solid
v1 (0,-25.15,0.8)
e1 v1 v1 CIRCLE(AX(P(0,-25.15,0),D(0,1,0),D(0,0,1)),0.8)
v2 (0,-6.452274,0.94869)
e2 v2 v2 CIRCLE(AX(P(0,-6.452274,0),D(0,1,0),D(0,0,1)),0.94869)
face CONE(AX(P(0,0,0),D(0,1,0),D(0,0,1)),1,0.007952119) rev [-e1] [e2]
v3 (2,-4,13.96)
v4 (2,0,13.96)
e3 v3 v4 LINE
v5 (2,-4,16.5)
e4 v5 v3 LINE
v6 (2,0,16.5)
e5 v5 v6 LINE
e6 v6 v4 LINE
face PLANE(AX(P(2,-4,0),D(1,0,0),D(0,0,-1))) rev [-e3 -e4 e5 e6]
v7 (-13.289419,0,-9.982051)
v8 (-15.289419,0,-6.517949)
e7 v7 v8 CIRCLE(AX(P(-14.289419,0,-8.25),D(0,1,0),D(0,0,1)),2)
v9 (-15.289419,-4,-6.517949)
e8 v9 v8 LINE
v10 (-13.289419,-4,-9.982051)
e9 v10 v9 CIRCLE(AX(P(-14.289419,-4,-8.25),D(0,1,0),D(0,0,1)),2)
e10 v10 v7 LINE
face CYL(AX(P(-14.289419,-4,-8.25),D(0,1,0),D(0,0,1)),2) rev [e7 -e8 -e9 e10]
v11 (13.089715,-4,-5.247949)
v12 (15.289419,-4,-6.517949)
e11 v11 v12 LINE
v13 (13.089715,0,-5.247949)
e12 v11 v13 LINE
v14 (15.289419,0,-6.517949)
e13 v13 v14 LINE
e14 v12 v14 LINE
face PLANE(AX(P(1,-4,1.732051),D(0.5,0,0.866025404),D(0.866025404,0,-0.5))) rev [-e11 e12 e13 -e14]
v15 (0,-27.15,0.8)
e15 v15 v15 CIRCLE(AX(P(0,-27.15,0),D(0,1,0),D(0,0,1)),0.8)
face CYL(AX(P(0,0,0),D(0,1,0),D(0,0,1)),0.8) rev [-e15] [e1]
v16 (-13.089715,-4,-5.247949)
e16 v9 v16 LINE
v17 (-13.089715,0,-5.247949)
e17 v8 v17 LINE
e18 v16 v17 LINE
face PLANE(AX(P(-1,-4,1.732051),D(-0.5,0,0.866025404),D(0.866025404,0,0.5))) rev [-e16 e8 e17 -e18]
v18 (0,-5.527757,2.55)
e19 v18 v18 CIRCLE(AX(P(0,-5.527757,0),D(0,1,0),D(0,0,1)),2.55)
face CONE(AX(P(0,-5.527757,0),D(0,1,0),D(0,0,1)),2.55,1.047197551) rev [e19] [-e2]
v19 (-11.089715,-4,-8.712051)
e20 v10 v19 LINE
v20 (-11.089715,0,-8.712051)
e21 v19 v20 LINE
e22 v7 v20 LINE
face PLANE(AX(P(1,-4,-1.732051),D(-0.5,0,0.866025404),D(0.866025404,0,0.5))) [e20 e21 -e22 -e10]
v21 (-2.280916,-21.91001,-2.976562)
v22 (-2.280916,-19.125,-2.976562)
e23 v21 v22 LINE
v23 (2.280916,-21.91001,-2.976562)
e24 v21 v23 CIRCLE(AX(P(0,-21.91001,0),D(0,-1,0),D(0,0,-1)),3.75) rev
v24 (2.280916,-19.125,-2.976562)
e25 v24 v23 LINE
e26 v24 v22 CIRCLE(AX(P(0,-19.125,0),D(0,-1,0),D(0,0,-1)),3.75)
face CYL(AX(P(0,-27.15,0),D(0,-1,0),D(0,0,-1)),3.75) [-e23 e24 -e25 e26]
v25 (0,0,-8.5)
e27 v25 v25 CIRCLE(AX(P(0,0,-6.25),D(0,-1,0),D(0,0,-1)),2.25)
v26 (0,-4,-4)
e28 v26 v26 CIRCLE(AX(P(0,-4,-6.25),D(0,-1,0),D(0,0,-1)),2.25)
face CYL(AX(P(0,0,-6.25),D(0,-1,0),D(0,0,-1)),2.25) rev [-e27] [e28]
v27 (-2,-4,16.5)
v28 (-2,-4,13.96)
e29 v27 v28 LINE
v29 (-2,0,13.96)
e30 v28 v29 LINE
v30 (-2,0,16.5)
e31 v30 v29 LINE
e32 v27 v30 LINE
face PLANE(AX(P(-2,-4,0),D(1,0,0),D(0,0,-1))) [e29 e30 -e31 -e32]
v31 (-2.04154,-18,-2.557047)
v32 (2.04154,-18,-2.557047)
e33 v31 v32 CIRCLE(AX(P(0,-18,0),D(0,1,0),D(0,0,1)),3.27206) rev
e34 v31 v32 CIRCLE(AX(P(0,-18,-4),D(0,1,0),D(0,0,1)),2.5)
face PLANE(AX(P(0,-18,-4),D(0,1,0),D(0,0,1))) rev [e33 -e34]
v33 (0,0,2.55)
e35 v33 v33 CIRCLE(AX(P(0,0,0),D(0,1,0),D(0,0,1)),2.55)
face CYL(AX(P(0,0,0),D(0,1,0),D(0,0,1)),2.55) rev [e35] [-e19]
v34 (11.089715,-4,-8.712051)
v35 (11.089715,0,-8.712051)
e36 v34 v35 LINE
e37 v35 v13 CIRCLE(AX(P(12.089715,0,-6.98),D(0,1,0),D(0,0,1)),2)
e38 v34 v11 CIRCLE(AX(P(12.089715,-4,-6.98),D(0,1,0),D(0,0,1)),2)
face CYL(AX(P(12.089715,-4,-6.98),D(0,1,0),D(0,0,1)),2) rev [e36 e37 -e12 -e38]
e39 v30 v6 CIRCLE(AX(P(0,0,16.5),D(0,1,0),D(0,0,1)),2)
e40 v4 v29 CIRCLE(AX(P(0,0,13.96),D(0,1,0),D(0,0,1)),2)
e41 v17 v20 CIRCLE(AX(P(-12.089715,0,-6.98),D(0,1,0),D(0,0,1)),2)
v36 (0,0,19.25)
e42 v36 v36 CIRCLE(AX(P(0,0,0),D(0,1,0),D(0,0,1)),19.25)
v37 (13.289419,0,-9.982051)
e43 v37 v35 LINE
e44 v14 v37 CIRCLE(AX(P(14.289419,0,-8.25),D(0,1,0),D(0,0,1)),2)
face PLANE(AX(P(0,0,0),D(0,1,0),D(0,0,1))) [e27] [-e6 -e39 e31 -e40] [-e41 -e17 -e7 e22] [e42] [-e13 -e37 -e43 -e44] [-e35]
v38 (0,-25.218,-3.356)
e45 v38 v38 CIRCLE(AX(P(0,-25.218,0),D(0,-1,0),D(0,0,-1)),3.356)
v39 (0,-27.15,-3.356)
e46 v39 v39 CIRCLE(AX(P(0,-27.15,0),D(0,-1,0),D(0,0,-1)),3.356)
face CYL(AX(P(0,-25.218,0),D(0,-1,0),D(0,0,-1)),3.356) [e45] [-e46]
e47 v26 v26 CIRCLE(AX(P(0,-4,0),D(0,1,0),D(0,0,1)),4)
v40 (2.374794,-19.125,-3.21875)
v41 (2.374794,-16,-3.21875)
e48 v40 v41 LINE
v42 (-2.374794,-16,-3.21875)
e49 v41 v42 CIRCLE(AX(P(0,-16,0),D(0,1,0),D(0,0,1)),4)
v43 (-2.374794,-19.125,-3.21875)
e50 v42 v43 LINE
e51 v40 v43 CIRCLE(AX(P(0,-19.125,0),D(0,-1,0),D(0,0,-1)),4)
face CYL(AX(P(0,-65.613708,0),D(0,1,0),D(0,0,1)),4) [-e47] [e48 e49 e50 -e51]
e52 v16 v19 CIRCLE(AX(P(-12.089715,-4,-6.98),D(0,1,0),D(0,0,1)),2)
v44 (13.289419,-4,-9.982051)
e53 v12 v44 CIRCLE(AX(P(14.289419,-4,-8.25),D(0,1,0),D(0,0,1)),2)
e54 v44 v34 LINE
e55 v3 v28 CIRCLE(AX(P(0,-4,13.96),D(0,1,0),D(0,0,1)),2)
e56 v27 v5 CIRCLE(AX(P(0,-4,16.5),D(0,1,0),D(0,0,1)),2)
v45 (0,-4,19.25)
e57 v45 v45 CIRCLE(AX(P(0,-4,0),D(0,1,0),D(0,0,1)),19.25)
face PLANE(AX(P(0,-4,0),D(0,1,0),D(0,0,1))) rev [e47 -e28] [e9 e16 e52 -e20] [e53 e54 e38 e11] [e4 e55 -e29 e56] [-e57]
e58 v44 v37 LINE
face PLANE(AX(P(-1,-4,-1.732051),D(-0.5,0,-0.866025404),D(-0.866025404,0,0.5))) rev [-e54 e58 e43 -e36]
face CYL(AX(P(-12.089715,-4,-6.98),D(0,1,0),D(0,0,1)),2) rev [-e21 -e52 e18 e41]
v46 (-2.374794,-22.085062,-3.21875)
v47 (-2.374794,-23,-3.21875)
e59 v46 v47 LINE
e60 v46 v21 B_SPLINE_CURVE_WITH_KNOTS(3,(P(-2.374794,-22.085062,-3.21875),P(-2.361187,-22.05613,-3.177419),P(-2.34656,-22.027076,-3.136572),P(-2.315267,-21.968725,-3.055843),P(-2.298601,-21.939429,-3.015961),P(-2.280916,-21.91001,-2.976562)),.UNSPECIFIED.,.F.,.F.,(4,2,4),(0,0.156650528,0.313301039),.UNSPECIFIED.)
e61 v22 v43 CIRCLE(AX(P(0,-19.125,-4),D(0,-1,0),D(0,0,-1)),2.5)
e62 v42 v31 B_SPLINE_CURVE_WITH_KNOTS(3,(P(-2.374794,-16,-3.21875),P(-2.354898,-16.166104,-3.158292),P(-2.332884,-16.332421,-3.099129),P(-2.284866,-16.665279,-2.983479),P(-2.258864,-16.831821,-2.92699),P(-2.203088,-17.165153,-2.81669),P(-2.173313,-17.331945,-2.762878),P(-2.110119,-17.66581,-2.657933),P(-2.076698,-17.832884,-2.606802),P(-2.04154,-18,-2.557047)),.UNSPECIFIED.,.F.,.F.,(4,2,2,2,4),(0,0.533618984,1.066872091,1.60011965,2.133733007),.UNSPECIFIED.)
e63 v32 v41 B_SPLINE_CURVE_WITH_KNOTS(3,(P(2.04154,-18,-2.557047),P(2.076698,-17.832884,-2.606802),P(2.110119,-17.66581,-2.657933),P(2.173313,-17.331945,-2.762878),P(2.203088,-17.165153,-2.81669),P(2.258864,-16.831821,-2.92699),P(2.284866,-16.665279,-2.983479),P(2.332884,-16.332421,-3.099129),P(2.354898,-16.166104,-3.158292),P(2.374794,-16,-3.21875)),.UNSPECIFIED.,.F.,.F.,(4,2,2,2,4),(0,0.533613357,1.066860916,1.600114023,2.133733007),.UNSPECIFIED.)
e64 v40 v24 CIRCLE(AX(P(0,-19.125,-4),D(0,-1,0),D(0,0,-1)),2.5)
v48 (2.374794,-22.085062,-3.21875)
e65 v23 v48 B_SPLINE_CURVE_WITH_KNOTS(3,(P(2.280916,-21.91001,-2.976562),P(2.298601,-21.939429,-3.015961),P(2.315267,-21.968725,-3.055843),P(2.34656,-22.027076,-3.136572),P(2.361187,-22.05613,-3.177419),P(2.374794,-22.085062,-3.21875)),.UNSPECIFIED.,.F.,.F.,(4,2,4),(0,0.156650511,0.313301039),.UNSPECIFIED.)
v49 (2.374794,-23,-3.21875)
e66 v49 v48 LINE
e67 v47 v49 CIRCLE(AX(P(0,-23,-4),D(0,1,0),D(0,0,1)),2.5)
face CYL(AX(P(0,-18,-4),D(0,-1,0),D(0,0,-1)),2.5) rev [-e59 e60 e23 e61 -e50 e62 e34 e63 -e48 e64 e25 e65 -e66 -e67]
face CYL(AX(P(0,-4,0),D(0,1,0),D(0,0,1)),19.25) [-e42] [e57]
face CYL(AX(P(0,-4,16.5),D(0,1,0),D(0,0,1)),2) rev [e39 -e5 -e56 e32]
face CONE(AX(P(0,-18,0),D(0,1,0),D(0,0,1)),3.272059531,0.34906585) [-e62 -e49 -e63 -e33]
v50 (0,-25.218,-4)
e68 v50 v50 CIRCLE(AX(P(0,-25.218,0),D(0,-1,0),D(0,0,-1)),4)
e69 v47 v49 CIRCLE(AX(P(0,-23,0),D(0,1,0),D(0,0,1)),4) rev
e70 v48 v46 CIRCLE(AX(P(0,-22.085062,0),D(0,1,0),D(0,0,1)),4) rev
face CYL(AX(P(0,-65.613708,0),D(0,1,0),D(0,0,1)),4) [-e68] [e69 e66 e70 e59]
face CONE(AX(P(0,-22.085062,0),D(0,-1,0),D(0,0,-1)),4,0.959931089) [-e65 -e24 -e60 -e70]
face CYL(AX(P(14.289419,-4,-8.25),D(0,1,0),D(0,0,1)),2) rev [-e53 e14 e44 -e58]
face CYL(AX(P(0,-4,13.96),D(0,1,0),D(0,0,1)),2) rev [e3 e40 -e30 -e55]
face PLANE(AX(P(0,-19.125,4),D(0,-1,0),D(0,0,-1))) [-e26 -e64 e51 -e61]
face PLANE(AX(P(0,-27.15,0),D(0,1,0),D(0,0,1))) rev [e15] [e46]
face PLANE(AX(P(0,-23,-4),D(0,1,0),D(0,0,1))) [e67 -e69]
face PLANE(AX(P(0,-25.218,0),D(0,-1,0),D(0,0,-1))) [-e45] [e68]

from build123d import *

# Parameters (mm, degrees)
SKETCH1_R           = 19.25
SKETCH1_R_2         = 4
BOSS_EXTRUDE1_DEPTH = 4
SKETCH1_4_R         = 4
BOSS_EXTRUDE2_DEPTH = 27.15
CUT_EXTRUDE1_START  = -1.932
SKETCH6_R           = 4
SKETCH6_R_2         = 3.356
CUT_EXTRUDE1_DEPTH  = 1.932
SKETCH7_R           = 2.25
CUT_EXTRUDE2_DEPTH  = 36.735801376
SKETCH8_R           = 2.5
CUT_EXTRUDE3_DEPTH  = 5
CHAMFER1_SIZE       = 2
CHAMFER1_SIZE2      = 0.727940469
SKETCH9_W           = 0.25
SKETCH9_H           = 2.75
CHAMFER3_SIZE       = 0.3
CHAMFER3_SIZE_2     = 0.210062261


with BuildPart() as part:
    # Sketch1 → Boss-Extrude1 (new body)
    # profile 1 of 2: a face of its own
    with BuildSketch(Plane(origin=(0, 0, 0), x_dir=(1, 0, 0), z_dir=(0, 1, 0))):
        with Locations(Location((0, 0, 0), (0, 0, 270))):
            Circle(SKETCH1_R)
        with BuildLine():
            ThreePointArc((2, -16.5), (0, -18.5), (-2, -16.5))
            Line((-2, -16.5), (-2, -16.378339354))
            ThreePointArc((-2, -16.378339354), (-14.289419162, -8.25), (-15.184057953, 6.45711887))
            Line((-15.184057953, 6.45711887), (-15.289419162, 6.517949192))
            ThreePointArc((-15.289419162, 6.517949192), (-16.02146997, 9.25), (-13.289419162, 9.982050808))
            Line((-13.289419162, 9.982050808), (-13.184057953, 9.921220485))
            ThreePointArc((-13.184057953, 9.921220485), (0, 16.5), (13.184057953, 9.921220485))
            Line((13.184057953, 9.921220485), (13.289419162, 9.982050808))
            ThreePointArc((13.289419162, 9.982050808), (16.02146997, 9.25), (15.289419162, 6.517949192))
            Line((15.289419162, 6.517949192), (15.184057953, 6.45711887))
            ThreePointArc((15.184057953, 6.45711887), (16.167667677, 3.294923655), (16.5, 0))
            ThreePointArc((16.5, 0), (12.354149101, -10.937321427), (2, -16.378339354))
            Line((2, -16.378339354), (2, -16.5))
        make_face(mode=Mode.SUBTRACT)
    # profile 2 of 2: a face of its own
    with BuildSketch(Plane(origin=(0, 0, 0), x_dir=(1, 0, 0), z_dir=(0, 1, 0))):
        with BuildLine():
            ThreePointArc((-15.184057953, 6.45711887), (-14.289419162, -8.25), (-2, -16.378339354))
            Line((-2, -16.378339354), (-2, -13.96))
            ThreePointArc((-2, -13.96), (0, -11.96), (2, -13.96))
            Line((2, -13.96), (2, -16.378339354))
            ThreePointArc((2, -16.378339354), (12.354149101, -10.937321427), (16.5, 0))
            ThreePointArc((16.5, 0), (16.167667677, 3.294923655), (15.184057953, 6.45711887))
            Line((15.184057953, 6.45711887), (13.089714637, 5.247949192))
            ThreePointArc((13.089714637, 5.247949192), (10.357663829, 5.98), (11.089714637, 8.712050808))
            Line((11.089714637, 8.712050808), (13.184057953, 9.921220485))
            ThreePointArc((13.184057953, 9.921220485), (0, 16.5), (-13.184057953, 9.921220485))
            Line((-13.184057953, 9.921220485), (-11.094979939, 8.715090731))
            Line((-11.094979939, 8.715090731), (-11.089714637, 8.712050808))
            ThreePointArc((-11.089714637, 8.712050808), (-10.357663829, 5.98), (-13.089714637, 5.247949192))
            Line((-13.089714637, 5.247949192), (-15.184057953, 6.45711887))
        make_face()
        with Locations(Location((0, 0, 0), (0, 0, 270))):
            Circle(SKETCH1_R_2, mode=Mode.SUBTRACT)
    extrude(amount=-BOSS_EXTRUDE1_DEPTH)

    # Sketch1<4> → Boss-Extrude2 (add)
    with BuildSketch(Plane(origin=(0, 0, 0), x_dir=(1, 0, 0), z_dir=(0, 1, 0))):
        with Locations(Location((0, 0, 0), (0, 0, 270))):
            Circle(SKETCH1_4_R)
    extrude(amount=-BOSS_EXTRUDE2_DEPTH)

    # Sketch2 → Cut-Revolve4 (revolve, cut)
    with BuildSketch(Plane(origin=(0, 0, 0), x_dir=(0, 0, -1), z_dir=(1, 0, 0)), mode=Mode.PRIVATE) as cut_revolve4_sk:
        Polygon((0, -27.15), (0.8, -27.15), (0.8, -25.15), (1, 0), (0, 0), align=None)
    revolve(cut_revolve4_sk.sketch.rotate(Axis((0, 0, 0), (0, -1, 0)), 180), axis=Axis((0, 0, 0), (0, -1, 0)), mode=Mode.SUBTRACT)

    # Sketch5 → Cut-Revolve8 (revolve, cut)
    with BuildSketch(Plane.XY, mode=Mode.PRIVATE) as cut_revolve8_sk:
        Polygon((0, -7), (-2.55, -5.527756814), (-2.55, 0), (0, 0), align=None)
    revolve(cut_revolve8_sk.sketch.rotate(Axis((0, 0, 0), (0, -1, 0)), 270), axis=Axis((0, 0, 0), (0, -1, 0)), mode=Mode.SUBTRACT)

    # Sketch6 → Cut-Extrude1 (cut)
    with BuildSketch(Plane.XZ.offset(27.15).offset(CUT_EXTRUDE1_START)):
        with Locations(Location((0, 0, 0), (0, 0, 90))):
            Circle(SKETCH6_R)
        with Locations(Location((0, 0, 0), (0, 0, 270))):
            Circle(SKETCH6_R_2, mode=Mode.SUBTRACT)
    extrude(amount=CUT_EXTRUDE1_DEPTH, mode=Mode.SUBTRACT)

    # Sketch7 → Cut-Extrude2 (cut, through all)
    with BuildSketch(Plane.XZ.offset(4)):
        with Locations(Location((0, -6.25, 0), (0, 0, 270))):
            Circle(SKETCH7_R)
    extrude(amount=-CUT_EXTRUDE2_DEPTH, mode=Mode.SUBTRACT)

    # Sketch8 → Cut-Extrude3 (cut)
    with BuildSketch(Plane(origin=(0, -23, 0), x_dir=(1, 0, 0), z_dir=(0, 1, 0))):
        with Locations((0, 4)):
            Circle(SKETCH8_R)
    extrude(amount=CUT_EXTRUDE3_DEPTH, mode=Mode.SUBTRACT)

    # Chamfer1
    chamfer1_edges = [part.edges().sort_by_distance(p)[0] for p in [
        (0, -18, -4),
    ]]
    chamfer1_side = [part.faces().sort_by_distance(p)[0] for p in [
        (0, -14.609, -4),
    ]]
    chamfer(chamfer1_edges, length=CHAMFER1_SIZE, length2=CHAMFER1_SIZE2, reference=chamfer1_side[0])

    # Sketch9 → Cut-Revolve9 (revolve, cut)
    with BuildSketch(Plane(origin=(0, 0, 0), x_dir=(0, 0, -1), z_dir=(1, 0, 0)), mode=Mode.PRIVATE) as cut_revolve9_sk:
        with Locations((-3.875, -20.5)):
            Rectangle(SKETCH9_W, SKETCH9_H)
    revolve(cut_revolve9_sk.sketch.rotate(Axis((0, -27.15, 0), (0, 1, 0)), 143.580086271), axis=Axis((0, -27.15, 0), (0, 1, 0)), mode=Mode.SUBTRACT)

    # Chamfer3
    # the kernel refuses this chamfer: 0.3, 0.210062261 mm, written as the material it takes off along each edge
    with BuildSketch(Plane(origin=(0, -21.875, 0), x_dir=(-0.42752924874280274, 0, -0.9040015162981834), z_dir=(0.9040015162981834, 0, -0.42752924874280274))) as chamfer3_piece_1_section:
        Polygon((4 - CHAMFER3_SIZE, 0), (4, -CHAMFER3_SIZE_2 * 1.0000000022), (4, 0), align=None)
    chamfer3_piece_1 = revolve(axis=Axis((0, -21.875, 0), (0, 1, 0)), revolution_arc=154.689138052, mode=Mode.PRIVATE)
    chamfer3_piece_1 = chamfer3_piece_1 - Plane(origin=(0, -21.995167344, 0), x_dir=(0.593698599754949, 0, -0.8046874999955033), z_dir=(0, -1, 0)) * Cylinder(3.75, 16, mode=Mode.PRIVATE)
    add(chamfer3_piece_1, mode=Mode.SUBTRACT)
    with BuildSketch(Plane(origin=(0, -21.875, 0), x_dir=(0, 0, 1), z_dir=(-1, 0, 0))) as chamfer3_piece_2_section:
        Polygon((4 - CHAMFER3_SIZE, 0), (4, -CHAMFER3_SIZE_2 * 1.0000000022), (4, 0), align=None)
    chamfer3_piece_2 = revolve(axis=Axis((0, -21.875, 0), (0, 1, 0)), revolution_arc=154.689138052, mode=Mode.PRIVATE)
    chamfer3_piece_2 = chamfer3_piece_2 - Plane(origin=(0, -21.995167344, 0), x_dir=(0.593698599754949, 0, -0.8046874999955033), z_dir=(0, -1, 0)) * Cylinder(3.75, 16, mode=Mode.PRIVATE)
    add(chamfer3_piece_2, mode=Mode.SUBTRACT)


solid = part.part
